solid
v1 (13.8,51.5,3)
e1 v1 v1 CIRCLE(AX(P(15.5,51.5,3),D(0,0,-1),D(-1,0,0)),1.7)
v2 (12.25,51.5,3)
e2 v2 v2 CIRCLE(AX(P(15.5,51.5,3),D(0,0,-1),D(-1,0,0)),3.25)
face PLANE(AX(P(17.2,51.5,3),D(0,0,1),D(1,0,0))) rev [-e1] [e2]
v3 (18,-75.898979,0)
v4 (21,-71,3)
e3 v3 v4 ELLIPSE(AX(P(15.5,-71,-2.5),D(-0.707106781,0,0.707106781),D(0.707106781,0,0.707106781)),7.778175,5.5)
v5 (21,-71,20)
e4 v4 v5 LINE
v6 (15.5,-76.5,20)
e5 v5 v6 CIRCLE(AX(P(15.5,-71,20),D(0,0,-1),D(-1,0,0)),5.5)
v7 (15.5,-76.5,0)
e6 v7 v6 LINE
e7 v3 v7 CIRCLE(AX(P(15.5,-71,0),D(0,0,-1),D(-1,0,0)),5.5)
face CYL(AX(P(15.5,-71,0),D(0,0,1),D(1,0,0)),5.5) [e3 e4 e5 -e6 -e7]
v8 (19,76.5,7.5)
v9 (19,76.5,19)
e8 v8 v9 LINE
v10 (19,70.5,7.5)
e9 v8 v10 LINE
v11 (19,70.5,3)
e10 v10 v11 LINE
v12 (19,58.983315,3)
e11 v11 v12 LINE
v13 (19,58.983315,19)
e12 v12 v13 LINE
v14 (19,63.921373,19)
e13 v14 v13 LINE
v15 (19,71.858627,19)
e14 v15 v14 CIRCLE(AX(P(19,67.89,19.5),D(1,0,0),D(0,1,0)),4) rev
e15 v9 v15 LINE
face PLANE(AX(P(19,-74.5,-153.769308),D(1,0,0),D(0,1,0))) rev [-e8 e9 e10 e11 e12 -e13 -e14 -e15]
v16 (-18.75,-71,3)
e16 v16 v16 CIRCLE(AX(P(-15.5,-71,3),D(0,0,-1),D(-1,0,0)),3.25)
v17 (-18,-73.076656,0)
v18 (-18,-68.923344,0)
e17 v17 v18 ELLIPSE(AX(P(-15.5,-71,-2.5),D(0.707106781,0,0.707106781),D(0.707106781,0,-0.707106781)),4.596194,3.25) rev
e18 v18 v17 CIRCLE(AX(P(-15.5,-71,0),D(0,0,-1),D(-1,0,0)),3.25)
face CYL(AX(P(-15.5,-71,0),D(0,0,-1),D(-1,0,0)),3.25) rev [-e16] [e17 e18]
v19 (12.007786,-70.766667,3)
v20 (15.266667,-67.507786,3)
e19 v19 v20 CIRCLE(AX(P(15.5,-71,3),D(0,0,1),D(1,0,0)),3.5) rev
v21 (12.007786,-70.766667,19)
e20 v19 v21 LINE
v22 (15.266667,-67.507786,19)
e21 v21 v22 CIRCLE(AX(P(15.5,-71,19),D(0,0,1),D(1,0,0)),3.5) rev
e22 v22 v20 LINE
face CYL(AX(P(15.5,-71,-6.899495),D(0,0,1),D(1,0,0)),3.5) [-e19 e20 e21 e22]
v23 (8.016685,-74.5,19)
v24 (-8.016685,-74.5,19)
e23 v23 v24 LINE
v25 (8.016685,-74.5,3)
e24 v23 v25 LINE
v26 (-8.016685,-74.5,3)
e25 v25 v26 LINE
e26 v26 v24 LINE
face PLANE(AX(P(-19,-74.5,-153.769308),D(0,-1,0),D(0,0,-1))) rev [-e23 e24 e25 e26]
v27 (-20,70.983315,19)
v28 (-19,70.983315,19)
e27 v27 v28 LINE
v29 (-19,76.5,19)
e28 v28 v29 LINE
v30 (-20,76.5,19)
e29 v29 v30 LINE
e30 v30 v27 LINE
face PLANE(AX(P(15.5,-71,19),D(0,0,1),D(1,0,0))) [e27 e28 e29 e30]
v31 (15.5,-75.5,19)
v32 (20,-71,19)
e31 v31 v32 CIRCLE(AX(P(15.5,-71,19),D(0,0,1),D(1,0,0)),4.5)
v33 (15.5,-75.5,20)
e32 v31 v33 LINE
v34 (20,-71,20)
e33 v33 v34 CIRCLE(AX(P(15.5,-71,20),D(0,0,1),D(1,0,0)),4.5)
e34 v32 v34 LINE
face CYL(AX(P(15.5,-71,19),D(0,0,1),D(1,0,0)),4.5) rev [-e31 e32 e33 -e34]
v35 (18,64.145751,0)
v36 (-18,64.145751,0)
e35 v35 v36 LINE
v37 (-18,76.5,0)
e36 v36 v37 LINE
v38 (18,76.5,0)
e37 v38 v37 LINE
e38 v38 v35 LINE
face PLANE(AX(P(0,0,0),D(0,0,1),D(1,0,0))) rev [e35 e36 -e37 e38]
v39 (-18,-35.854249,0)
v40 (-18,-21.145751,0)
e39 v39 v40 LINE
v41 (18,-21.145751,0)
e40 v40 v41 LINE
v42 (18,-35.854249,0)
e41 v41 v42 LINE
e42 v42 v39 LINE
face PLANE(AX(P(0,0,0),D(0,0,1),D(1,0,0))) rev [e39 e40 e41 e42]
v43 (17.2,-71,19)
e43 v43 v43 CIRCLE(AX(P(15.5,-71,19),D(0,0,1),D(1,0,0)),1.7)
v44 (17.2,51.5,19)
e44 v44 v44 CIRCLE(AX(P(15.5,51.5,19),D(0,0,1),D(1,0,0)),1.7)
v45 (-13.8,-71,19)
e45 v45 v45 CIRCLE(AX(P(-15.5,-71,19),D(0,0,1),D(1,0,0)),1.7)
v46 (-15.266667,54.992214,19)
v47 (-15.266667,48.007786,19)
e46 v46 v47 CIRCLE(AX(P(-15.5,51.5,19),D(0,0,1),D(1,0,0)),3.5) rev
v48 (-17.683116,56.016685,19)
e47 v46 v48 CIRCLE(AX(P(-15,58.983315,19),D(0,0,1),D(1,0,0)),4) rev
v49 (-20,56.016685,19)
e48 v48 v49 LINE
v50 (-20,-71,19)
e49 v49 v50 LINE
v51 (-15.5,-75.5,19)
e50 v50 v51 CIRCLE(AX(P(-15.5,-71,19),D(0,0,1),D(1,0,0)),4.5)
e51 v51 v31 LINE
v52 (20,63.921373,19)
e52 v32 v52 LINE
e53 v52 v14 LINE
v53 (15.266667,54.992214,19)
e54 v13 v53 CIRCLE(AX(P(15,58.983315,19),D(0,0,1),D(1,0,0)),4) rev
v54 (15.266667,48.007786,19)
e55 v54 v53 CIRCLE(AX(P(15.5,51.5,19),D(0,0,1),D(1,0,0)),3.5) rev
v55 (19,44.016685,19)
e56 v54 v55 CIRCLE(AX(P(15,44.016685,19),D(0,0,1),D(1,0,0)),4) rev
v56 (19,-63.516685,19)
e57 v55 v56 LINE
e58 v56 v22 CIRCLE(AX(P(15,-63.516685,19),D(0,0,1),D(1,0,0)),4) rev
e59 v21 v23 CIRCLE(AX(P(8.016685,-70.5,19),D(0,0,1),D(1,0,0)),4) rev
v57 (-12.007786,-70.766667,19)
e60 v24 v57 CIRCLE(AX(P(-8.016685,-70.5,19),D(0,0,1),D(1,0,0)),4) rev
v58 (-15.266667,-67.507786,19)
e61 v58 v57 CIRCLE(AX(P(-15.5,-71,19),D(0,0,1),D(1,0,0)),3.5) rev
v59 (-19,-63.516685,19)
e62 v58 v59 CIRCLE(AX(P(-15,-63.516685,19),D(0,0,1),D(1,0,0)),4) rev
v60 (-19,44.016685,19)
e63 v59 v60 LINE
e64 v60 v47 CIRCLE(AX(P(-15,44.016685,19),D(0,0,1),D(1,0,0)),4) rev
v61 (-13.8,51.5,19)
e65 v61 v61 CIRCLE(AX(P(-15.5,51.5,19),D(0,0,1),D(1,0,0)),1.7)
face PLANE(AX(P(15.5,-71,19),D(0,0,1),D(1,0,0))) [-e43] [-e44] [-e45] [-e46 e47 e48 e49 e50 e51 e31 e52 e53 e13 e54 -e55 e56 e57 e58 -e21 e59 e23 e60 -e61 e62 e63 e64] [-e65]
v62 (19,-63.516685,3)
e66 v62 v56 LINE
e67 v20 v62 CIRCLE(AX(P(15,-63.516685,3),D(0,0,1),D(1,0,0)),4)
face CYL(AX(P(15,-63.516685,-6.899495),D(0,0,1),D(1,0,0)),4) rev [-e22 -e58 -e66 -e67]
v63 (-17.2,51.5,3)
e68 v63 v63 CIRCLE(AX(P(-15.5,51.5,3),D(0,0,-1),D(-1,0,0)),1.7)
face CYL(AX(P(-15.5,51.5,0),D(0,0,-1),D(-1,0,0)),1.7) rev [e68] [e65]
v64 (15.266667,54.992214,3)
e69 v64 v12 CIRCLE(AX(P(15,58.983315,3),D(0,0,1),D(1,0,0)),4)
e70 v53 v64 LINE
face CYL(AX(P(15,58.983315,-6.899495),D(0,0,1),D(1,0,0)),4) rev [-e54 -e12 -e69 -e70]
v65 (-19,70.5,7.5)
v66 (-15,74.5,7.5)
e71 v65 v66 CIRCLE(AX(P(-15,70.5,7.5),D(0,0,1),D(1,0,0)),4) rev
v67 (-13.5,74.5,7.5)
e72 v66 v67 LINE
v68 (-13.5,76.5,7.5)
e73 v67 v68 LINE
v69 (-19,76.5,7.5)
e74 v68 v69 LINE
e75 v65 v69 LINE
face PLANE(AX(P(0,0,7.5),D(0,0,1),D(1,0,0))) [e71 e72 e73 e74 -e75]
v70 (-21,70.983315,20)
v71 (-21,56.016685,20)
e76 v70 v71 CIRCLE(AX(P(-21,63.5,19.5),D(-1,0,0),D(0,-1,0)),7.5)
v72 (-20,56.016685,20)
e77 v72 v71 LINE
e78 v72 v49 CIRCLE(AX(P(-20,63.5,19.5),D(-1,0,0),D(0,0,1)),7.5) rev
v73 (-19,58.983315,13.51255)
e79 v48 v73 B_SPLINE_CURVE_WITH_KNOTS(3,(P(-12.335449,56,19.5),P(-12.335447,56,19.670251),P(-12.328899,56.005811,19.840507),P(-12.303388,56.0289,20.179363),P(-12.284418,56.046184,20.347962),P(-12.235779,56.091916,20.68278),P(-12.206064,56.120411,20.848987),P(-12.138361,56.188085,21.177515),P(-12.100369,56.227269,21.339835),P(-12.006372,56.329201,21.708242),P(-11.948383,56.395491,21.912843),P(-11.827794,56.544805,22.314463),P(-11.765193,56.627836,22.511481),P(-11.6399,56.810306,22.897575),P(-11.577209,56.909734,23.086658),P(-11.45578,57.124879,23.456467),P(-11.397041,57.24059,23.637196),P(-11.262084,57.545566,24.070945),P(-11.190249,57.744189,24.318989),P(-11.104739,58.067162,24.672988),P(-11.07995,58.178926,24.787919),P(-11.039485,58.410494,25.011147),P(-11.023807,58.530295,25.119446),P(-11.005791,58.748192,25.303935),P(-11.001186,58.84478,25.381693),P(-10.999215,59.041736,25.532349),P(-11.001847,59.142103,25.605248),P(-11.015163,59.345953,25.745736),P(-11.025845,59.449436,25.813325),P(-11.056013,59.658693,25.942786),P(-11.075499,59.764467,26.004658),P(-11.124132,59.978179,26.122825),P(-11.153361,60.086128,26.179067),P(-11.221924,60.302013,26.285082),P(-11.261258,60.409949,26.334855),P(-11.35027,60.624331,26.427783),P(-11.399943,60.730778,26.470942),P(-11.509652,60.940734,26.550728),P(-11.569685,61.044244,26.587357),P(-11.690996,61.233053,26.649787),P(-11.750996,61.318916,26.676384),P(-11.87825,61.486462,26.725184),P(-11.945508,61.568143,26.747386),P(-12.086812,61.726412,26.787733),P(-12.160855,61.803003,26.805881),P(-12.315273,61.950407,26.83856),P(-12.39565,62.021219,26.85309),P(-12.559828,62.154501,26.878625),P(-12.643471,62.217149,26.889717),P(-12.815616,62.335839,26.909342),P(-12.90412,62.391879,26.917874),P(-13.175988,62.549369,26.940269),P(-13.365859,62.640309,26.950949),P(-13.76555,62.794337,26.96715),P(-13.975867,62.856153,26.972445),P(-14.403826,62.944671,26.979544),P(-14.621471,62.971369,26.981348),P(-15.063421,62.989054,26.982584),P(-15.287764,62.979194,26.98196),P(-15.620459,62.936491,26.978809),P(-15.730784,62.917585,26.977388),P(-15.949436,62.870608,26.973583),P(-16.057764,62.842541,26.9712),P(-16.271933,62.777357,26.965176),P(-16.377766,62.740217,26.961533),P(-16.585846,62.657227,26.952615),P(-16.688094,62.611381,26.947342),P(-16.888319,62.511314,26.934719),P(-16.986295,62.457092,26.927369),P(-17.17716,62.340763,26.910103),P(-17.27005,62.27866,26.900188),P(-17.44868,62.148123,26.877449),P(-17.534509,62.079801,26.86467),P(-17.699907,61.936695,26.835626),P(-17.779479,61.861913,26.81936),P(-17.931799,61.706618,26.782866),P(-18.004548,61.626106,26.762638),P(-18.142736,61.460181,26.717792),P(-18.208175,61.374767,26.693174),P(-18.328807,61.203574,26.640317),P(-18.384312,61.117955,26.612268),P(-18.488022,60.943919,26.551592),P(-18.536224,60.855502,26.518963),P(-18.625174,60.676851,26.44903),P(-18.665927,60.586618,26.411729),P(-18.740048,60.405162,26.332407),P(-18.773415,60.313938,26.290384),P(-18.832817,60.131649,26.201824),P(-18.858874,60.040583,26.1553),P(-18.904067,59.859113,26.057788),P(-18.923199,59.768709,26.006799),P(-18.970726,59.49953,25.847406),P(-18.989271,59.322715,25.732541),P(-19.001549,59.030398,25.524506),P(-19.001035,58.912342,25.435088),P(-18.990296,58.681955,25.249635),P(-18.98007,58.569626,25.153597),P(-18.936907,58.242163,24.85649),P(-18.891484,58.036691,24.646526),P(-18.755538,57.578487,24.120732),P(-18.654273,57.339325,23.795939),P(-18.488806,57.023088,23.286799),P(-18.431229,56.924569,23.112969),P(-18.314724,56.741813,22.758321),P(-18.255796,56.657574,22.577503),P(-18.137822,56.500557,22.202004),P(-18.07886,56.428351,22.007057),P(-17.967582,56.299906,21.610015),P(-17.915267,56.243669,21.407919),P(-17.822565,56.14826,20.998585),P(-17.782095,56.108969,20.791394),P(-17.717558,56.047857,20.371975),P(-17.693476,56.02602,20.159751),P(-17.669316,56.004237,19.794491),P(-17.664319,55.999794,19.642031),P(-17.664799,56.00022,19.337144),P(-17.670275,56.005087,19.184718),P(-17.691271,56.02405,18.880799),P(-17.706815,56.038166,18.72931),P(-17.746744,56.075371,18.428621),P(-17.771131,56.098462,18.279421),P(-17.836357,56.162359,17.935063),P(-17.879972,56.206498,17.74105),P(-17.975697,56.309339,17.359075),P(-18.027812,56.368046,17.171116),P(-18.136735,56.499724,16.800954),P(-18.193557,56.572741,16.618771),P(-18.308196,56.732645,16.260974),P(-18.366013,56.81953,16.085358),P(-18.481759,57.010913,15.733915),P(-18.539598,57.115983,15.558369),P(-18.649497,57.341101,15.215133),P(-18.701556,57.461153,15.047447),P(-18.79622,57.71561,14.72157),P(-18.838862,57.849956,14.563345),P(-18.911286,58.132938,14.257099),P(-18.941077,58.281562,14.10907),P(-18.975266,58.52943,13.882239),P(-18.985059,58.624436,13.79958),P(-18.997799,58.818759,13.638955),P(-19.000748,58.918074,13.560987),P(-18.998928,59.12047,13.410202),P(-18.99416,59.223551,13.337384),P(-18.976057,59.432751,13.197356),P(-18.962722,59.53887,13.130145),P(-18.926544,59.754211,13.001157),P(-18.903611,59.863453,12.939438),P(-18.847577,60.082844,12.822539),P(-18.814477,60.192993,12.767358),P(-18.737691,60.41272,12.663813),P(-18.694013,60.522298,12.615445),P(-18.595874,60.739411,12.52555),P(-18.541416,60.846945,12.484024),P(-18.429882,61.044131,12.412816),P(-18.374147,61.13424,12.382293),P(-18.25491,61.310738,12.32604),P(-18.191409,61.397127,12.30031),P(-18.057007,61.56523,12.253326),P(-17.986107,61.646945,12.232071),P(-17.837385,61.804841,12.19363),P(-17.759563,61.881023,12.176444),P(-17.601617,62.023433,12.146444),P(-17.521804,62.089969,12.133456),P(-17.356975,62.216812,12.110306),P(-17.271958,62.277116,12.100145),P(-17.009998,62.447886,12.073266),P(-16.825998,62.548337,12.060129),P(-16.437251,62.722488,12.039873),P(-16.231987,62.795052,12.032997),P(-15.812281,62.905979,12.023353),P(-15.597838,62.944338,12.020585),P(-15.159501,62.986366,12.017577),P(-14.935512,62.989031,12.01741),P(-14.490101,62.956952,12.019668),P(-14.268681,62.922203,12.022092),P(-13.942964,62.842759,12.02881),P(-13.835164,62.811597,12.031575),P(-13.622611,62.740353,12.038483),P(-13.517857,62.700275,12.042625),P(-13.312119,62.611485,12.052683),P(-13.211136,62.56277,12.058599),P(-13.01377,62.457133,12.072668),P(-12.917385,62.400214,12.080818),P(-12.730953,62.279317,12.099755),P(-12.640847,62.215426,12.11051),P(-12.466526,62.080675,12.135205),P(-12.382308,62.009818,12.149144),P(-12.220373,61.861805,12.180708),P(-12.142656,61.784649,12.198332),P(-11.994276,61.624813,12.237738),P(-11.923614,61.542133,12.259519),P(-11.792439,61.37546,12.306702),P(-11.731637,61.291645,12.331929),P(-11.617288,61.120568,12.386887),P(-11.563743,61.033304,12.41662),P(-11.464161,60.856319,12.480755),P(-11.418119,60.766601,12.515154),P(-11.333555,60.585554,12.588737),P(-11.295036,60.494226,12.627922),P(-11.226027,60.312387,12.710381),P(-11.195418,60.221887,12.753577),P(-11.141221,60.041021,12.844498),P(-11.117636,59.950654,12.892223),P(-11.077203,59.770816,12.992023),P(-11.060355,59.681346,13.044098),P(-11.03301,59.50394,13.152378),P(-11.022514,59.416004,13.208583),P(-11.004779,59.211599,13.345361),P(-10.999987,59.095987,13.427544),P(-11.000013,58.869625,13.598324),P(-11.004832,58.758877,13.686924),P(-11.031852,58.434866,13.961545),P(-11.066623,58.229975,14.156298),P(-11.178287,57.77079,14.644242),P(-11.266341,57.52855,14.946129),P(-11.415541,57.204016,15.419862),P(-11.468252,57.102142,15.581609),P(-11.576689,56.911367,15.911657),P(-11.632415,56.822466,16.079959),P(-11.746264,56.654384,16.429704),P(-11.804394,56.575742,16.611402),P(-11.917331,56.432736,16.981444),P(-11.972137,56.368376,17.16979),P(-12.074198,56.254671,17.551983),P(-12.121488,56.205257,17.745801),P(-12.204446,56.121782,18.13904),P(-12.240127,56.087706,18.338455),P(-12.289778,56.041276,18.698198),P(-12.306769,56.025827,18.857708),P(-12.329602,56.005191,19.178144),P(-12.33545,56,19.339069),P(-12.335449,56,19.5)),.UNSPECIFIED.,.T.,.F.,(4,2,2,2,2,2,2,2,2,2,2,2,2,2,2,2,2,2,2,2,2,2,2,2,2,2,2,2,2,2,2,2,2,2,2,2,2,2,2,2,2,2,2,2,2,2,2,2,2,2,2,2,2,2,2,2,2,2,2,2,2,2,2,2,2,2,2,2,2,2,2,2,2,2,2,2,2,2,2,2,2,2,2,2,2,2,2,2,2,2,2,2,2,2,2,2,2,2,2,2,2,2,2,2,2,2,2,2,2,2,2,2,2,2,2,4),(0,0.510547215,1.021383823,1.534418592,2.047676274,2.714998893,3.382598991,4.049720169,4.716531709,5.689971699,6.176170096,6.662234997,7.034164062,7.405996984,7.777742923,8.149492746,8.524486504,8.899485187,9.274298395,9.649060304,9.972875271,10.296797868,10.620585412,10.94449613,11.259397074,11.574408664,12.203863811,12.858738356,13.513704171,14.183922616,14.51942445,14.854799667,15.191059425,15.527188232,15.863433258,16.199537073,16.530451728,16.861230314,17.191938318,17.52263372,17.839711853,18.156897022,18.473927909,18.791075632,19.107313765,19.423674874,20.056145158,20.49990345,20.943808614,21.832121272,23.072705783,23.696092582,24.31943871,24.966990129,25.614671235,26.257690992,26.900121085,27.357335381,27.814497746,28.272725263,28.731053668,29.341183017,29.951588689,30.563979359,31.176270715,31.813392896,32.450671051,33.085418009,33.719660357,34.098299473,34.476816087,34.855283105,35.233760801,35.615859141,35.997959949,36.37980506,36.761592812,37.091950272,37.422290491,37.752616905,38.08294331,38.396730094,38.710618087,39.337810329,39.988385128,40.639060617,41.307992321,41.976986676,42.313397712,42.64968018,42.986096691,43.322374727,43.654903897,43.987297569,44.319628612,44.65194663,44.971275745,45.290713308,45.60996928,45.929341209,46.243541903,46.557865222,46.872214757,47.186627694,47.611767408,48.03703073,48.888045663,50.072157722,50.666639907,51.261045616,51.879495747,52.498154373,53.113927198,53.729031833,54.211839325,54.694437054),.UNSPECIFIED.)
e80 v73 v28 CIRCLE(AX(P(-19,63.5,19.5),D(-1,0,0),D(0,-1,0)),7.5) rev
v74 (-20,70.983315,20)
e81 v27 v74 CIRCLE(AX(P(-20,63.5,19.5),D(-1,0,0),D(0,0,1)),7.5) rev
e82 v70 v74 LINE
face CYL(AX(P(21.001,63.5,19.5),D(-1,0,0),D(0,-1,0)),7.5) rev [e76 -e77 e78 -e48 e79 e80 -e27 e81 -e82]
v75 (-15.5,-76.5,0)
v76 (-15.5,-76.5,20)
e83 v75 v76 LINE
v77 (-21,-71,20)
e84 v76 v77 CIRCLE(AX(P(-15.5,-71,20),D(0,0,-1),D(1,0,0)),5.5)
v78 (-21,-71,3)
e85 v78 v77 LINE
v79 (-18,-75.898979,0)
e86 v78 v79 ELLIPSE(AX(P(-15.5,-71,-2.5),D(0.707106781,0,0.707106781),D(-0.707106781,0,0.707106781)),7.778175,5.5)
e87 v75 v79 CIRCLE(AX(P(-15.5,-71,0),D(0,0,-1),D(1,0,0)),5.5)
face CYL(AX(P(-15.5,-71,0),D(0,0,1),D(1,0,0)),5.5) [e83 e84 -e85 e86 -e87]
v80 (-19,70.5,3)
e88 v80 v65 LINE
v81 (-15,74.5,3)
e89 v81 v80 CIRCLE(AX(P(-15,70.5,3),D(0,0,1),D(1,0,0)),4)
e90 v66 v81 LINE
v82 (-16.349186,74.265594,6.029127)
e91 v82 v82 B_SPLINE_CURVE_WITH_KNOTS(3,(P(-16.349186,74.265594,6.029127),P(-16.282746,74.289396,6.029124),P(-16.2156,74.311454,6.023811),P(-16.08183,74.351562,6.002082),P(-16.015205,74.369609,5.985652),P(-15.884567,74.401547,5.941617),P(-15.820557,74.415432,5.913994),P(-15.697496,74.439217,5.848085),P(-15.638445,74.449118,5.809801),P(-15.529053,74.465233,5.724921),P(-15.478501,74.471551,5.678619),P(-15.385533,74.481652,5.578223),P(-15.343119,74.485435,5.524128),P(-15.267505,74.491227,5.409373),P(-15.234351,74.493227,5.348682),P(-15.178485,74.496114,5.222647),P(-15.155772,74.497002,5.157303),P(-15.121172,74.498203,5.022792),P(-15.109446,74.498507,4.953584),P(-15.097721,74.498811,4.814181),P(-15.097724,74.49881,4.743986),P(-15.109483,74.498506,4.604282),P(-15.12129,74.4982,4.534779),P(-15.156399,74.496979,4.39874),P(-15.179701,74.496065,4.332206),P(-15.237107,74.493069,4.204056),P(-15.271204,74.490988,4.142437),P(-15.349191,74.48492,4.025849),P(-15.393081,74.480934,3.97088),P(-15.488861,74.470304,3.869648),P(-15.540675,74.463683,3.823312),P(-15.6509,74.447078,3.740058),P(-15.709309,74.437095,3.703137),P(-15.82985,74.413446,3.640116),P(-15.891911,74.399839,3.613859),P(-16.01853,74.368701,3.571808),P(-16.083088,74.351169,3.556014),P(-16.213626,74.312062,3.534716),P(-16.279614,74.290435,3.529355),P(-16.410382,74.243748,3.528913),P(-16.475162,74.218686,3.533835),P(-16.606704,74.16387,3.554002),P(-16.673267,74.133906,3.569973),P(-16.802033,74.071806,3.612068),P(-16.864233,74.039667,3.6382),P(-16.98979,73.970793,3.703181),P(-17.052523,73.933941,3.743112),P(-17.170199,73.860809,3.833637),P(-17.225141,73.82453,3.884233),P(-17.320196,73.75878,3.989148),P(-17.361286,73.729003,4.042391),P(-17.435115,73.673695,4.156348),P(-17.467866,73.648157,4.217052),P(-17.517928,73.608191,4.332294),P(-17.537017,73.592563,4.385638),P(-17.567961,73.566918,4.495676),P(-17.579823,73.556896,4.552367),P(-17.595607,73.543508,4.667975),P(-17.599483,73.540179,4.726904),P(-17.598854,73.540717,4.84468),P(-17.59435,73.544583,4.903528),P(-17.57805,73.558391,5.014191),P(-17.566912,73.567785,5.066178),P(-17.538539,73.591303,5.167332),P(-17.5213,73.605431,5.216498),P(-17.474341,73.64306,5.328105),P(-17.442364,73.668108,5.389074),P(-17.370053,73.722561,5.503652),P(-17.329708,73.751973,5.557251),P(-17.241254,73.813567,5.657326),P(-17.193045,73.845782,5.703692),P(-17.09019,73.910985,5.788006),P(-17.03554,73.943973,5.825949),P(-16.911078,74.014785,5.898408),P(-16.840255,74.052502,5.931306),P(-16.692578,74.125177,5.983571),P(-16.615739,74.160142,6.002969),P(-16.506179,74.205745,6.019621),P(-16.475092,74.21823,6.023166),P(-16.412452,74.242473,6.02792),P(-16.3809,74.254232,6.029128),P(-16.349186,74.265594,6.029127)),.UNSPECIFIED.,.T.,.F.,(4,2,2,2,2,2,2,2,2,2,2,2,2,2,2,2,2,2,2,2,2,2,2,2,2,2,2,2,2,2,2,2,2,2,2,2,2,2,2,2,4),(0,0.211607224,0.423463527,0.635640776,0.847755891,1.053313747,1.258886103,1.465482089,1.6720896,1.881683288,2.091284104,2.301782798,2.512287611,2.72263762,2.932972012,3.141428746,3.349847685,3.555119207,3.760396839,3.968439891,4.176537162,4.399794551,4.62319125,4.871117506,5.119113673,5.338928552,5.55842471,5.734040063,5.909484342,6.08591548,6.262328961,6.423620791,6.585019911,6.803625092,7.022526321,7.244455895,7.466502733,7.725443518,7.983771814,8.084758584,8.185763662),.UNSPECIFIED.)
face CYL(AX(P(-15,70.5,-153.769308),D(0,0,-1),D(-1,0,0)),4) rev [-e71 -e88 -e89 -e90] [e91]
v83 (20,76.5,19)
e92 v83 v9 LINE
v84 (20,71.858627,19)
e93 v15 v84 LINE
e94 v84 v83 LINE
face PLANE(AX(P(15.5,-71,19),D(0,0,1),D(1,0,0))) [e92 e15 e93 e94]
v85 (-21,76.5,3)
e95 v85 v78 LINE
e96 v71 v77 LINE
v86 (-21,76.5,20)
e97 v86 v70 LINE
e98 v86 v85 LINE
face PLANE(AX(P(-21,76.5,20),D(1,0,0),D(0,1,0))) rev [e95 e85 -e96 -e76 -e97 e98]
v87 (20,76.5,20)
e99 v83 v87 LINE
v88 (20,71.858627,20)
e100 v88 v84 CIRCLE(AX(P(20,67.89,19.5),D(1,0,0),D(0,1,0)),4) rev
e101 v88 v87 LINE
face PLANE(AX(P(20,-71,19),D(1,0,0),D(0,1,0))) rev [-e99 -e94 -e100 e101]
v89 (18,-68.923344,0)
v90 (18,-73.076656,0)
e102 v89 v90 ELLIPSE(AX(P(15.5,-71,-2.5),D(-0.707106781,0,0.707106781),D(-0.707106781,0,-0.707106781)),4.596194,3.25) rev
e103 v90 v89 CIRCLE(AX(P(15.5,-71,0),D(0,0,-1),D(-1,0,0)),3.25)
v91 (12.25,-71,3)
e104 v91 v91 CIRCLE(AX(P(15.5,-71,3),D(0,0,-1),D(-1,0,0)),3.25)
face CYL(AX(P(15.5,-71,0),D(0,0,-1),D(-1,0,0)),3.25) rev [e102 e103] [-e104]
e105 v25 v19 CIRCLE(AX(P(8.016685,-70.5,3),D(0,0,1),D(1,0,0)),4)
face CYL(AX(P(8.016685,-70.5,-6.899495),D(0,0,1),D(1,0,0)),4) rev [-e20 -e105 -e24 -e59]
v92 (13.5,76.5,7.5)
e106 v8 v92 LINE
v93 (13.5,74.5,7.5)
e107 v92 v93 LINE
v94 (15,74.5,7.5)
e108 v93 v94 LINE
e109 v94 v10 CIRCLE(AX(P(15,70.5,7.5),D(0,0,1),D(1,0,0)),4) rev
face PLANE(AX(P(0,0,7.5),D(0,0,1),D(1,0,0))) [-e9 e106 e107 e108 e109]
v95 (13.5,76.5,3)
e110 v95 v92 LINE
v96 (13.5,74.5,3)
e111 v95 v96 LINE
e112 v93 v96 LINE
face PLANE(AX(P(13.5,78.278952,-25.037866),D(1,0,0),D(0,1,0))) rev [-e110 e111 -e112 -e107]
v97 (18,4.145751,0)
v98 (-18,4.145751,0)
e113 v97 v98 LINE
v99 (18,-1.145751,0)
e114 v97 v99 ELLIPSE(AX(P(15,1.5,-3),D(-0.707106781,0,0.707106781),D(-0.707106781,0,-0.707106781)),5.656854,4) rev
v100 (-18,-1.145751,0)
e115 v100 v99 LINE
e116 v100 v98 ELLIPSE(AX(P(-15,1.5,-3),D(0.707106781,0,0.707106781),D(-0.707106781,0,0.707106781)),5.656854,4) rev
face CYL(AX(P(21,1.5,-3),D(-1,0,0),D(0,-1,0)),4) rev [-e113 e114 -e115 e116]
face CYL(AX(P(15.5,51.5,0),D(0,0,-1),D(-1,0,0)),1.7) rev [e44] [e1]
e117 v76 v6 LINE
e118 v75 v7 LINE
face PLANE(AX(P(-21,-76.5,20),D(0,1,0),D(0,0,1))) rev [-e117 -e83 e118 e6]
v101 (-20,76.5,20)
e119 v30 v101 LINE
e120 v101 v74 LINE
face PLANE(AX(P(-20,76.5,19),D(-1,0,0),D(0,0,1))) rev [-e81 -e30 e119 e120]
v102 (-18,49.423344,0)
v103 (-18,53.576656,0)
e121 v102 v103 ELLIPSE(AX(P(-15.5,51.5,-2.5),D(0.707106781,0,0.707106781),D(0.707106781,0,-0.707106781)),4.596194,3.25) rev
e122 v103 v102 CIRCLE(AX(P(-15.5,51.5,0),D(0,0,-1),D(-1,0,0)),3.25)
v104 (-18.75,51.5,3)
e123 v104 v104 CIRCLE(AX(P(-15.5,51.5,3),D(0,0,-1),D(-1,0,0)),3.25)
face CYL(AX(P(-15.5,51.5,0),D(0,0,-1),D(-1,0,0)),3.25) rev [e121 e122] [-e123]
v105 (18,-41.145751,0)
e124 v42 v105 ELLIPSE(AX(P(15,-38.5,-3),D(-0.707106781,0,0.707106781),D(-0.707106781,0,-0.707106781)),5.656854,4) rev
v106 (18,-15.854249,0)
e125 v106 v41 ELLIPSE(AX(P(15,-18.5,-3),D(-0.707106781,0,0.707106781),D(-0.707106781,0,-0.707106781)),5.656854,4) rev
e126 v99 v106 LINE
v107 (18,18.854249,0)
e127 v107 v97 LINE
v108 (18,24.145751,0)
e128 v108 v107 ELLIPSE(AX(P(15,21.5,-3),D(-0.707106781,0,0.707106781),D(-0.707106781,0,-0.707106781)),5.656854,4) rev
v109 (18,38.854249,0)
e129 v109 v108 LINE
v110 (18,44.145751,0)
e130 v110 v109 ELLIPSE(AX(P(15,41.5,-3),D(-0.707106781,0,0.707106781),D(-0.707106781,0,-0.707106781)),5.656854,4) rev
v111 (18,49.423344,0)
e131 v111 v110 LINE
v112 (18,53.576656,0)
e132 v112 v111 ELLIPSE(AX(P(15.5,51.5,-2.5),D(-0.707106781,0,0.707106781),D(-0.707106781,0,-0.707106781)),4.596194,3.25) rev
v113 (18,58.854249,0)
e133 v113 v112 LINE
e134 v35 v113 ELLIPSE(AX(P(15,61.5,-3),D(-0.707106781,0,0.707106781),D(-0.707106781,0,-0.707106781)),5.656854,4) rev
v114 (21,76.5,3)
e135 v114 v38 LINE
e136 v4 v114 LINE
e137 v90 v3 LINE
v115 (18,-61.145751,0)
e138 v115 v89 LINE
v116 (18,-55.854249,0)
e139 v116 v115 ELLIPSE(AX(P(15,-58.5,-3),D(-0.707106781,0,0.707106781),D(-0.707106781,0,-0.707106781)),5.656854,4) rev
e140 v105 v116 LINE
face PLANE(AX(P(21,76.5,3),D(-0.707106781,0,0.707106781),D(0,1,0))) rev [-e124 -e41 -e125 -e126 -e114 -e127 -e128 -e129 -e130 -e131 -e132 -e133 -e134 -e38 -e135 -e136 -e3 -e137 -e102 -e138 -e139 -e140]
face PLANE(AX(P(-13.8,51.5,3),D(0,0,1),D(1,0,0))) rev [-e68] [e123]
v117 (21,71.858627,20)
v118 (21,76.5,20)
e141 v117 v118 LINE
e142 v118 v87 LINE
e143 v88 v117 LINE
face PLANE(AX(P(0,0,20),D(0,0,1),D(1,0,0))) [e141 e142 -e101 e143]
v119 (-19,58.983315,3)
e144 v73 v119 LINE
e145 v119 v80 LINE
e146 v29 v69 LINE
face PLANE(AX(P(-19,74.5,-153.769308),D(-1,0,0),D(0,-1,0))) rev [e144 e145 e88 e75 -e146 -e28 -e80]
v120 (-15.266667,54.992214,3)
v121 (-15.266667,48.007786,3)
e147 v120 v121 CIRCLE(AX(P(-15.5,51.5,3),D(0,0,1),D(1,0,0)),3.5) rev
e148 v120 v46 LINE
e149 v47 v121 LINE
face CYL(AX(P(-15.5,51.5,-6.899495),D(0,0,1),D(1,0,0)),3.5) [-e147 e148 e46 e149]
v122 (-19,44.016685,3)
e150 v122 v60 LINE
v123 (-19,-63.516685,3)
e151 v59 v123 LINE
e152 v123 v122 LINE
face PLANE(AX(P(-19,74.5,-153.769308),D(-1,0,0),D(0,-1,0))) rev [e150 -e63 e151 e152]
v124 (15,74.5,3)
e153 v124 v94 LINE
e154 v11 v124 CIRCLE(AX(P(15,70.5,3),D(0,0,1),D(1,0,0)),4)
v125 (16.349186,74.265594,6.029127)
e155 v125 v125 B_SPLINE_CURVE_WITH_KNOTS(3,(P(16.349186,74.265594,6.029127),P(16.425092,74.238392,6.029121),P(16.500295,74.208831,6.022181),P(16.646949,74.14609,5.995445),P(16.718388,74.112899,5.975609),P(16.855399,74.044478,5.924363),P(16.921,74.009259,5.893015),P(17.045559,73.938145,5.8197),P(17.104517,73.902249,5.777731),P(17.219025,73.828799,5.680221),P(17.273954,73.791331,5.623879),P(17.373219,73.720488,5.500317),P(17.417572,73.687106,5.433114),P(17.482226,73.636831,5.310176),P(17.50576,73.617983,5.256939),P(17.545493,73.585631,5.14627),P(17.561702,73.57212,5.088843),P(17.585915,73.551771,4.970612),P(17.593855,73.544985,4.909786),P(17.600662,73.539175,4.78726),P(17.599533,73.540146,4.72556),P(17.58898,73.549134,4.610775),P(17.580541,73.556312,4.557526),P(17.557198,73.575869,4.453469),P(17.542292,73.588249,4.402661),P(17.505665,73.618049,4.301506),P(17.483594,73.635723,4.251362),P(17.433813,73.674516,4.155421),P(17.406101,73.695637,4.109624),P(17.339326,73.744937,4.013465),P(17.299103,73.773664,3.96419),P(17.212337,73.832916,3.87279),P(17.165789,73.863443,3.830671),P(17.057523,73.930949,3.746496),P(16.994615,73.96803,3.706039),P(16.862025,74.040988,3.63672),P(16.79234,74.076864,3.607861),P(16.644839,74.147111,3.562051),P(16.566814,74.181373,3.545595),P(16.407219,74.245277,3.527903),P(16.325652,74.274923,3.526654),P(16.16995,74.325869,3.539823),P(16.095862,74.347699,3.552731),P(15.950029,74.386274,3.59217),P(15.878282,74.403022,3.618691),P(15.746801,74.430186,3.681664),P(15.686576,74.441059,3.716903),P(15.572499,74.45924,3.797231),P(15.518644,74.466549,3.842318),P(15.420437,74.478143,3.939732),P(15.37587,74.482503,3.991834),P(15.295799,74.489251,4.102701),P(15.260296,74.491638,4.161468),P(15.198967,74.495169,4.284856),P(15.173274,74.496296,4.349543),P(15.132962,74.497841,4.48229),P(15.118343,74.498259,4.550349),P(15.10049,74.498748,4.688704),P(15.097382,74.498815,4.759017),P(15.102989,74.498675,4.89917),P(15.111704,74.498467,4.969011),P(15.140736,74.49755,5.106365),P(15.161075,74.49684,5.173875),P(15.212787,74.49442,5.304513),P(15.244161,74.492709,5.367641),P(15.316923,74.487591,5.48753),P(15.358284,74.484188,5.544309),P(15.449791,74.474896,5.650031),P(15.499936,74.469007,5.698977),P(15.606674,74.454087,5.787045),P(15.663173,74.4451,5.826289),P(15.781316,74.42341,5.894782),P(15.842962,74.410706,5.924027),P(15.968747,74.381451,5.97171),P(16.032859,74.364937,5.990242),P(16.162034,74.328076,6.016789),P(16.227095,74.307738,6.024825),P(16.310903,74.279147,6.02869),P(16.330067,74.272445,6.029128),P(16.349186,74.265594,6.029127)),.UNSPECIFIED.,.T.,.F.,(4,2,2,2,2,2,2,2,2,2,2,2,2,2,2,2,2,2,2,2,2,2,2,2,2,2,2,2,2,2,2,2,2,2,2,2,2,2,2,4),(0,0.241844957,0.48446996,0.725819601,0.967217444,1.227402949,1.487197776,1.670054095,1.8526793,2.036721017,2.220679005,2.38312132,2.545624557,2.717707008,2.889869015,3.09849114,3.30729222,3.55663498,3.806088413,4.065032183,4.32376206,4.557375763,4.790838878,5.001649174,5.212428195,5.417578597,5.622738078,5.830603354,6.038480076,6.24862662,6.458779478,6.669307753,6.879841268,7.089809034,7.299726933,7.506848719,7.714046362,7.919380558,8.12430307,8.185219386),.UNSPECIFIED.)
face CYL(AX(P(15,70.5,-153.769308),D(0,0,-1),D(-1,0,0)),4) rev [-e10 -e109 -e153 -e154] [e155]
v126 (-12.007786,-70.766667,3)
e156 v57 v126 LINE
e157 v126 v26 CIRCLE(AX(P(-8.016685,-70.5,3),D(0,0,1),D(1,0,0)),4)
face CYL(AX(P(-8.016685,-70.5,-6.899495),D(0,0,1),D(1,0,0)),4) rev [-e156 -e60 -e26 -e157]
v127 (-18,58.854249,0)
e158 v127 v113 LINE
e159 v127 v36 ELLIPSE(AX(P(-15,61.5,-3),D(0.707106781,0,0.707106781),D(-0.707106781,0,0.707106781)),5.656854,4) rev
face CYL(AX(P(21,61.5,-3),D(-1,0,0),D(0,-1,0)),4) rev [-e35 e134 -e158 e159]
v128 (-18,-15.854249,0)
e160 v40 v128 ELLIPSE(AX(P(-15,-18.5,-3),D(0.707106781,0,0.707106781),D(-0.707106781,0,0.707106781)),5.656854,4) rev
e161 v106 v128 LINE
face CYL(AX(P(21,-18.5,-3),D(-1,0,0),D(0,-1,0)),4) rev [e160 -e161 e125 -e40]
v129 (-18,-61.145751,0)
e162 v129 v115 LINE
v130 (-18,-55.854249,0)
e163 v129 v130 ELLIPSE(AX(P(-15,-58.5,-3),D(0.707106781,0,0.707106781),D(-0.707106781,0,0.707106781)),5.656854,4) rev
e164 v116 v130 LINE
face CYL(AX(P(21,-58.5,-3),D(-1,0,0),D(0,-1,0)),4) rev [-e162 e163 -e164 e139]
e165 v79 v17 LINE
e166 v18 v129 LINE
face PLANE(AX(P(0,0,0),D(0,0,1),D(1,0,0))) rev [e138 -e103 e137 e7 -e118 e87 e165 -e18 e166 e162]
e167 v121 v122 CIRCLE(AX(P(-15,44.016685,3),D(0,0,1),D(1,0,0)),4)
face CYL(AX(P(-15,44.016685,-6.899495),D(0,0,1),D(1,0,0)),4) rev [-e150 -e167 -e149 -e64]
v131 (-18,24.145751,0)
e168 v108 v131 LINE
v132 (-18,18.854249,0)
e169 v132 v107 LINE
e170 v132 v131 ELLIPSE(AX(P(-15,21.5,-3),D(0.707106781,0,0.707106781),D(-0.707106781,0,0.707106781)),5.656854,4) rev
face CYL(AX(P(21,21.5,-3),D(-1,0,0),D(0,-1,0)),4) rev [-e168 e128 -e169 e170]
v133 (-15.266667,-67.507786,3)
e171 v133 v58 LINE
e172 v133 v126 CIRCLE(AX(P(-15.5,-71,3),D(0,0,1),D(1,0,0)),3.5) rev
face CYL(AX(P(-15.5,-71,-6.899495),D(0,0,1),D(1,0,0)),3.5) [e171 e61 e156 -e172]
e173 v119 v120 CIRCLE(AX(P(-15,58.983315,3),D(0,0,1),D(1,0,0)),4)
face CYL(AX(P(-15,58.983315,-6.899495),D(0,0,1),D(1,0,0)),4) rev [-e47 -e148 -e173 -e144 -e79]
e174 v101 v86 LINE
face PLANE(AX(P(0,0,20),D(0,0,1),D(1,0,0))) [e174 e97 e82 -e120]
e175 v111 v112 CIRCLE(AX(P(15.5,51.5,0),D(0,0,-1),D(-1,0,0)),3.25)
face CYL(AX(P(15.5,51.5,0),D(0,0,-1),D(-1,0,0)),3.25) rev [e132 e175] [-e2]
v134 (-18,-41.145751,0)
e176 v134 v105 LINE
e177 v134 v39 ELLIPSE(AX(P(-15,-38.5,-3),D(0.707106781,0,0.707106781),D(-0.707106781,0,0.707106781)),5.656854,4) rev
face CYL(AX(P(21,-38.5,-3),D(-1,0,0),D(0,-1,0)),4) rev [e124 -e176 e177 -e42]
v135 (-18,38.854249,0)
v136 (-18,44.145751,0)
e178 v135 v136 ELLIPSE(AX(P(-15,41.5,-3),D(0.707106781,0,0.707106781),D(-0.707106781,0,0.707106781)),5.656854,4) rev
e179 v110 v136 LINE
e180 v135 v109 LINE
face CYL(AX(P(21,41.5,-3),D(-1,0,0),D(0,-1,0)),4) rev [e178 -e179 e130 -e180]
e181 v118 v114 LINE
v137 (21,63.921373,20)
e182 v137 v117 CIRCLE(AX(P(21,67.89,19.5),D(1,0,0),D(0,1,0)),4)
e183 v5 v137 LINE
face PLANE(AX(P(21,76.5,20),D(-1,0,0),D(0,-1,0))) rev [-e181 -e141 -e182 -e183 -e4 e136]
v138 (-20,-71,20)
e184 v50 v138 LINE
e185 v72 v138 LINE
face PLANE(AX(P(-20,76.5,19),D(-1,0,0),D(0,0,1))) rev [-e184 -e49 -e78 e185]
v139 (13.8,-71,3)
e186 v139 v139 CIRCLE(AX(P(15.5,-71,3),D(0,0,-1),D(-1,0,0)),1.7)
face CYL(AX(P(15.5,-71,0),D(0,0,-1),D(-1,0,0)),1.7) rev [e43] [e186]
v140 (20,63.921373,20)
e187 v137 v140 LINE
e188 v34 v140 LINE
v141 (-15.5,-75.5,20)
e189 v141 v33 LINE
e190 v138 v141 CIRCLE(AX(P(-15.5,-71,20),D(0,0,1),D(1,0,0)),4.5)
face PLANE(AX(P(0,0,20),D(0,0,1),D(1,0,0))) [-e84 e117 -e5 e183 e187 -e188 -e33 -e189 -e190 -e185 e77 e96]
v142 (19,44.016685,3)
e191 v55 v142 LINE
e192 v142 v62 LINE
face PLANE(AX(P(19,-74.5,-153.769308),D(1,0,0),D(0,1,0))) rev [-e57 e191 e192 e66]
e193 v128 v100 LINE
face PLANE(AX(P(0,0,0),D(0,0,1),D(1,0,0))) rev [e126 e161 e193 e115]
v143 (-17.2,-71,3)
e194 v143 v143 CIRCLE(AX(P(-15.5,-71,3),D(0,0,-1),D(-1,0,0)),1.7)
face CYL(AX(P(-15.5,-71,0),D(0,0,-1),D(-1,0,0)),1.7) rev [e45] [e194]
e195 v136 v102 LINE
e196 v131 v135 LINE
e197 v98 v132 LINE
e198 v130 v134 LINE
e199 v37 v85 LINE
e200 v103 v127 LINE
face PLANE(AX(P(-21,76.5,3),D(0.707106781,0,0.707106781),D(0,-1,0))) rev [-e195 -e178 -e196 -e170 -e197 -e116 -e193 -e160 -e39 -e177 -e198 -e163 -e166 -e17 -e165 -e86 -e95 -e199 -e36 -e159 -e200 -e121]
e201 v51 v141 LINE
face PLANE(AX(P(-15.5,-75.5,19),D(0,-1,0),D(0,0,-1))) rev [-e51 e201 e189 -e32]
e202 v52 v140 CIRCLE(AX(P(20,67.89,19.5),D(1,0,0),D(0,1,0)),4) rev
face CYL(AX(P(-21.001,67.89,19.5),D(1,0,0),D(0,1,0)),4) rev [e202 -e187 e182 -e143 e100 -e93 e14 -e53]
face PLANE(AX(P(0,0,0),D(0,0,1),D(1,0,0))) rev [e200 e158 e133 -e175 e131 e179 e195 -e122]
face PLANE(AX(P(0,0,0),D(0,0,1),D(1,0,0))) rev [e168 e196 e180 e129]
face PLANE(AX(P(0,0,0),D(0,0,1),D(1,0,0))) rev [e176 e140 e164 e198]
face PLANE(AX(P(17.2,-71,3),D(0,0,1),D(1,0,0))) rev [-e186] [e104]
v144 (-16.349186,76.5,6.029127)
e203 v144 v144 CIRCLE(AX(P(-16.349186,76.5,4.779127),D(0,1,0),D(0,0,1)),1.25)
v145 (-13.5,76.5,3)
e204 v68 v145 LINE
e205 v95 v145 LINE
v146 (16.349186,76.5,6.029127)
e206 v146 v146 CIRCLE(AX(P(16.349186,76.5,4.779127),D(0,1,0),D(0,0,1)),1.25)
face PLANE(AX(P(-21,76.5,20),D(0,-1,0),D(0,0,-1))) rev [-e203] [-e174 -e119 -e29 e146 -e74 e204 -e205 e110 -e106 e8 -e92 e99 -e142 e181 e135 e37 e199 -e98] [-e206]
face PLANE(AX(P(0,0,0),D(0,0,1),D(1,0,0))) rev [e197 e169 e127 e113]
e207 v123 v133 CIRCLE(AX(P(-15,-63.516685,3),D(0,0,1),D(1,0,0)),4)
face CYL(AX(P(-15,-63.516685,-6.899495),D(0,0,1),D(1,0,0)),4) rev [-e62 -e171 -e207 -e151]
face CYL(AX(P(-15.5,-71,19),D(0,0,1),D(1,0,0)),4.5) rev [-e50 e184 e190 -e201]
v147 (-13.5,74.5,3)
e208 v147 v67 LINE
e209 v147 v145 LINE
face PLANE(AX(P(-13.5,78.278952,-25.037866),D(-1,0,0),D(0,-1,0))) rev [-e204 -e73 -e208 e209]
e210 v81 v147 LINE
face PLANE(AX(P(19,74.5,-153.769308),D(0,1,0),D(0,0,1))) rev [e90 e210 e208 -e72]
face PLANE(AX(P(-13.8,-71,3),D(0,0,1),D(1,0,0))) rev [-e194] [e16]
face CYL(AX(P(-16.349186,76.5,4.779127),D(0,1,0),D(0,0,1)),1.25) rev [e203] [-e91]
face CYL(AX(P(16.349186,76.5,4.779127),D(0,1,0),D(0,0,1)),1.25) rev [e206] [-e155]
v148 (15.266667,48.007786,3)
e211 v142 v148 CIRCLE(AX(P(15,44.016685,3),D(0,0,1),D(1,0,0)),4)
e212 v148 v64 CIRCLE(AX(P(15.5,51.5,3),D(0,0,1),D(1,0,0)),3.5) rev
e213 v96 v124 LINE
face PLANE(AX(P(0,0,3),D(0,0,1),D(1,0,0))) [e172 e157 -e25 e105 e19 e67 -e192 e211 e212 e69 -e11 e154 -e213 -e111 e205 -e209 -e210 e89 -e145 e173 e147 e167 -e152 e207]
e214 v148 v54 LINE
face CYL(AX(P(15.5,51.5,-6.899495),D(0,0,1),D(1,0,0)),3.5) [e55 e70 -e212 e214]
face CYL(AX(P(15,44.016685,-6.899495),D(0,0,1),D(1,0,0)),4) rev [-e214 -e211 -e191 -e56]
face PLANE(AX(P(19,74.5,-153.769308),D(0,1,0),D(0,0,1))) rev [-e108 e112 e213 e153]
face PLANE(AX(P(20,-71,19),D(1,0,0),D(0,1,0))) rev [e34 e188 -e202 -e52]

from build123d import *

# Parameters (mm, degrees)
SKETCH_1_W                  = 42
SKETCH_1_H                  = 153
EXTRUDE_1_DEPTH             = 20
SKETCH_2_W                  = 38
SKETCH_2_H                  = 149
CUT_EXTRUDE_1_DEPTH         = 17
EXTRUDE_3_DEPTH             = 17
FILLET_START                = 2
FILLET_2_DEPTH              = 18
CHAMFER_1_SIZE              = 3
CUT_EXTRUDE_3_DEPTH         = 82.812285141
SKETCH_8_R                  = 4
CUT_EXTRUDE_4_DEPTH         = 90.533513279
SKETCH_13_W                 = 27
SKETCH_13_H                 = 7.55790464
CUT_EXTRUDE_6_DEPTH         = 17
SKETCH_14_W                 = 38
SKETCH_14_H                 = 15.071373518
CUT_EXTRUDE_7_DEPTH         = 12.5
CUT_EXTRUDE_8_DEPTH         = 1
HOLE_WIZARD_M31_D           = 3.4
HOLE_WIZARD_M31_CBORE_D     = 6.5
HOLE_WIZARD_M31_CBORE_DEPTH = 3
M3X0_51_D                   = 2.5
M3X0_51_DEPTH               = 12.5
M3X0_51_TIP                 = 0.751075774
CUT_EXTRUDE_9_REACH         = 91.534
SKETCH_22_R                 = 7.5
CUT_EXTRUDE_10_REACH        = 91.534
SKETCH_23_R                 = 4


with BuildPart() as part:
    # Эскиз1 → Бобышка-Вытянуть1 (new body)
    with BuildSketch(Plane.XY):
        Rectangle(SKETCH_1_W, SKETCH_1_H)
    extrude(amount=EXTRUDE_1_DEPTH)

    # Эскиз2 → Вырез-Вытянуть1 (cut)
    with BuildSketch(Plane.XY.offset(20)):
        Rectangle(SKETCH_2_W, SKETCH_2_H)
    extrude(amount=-CUT_EXTRUDE_1_DEPTH, mode=Mode.SUBTRACT)

    # Эскиз3 → Бобышка-Вытянуть3 (add)
    with BuildSketch(Plane.XY.offset(20)):
        with BuildLine():
            Line((-19, -71), (-19, -74.5))
            Line((-19, -74.5), (-15.5, -74.5))
            ThreePointArc((-15.5, -74.5), (-13.025126266, -68.525126266), (-19, -71))
        make_face()
        with BuildLine():
            Line((19, -71), (19, -74.5))
            Line((19, -74.5), (15.5, -74.5))
            ThreePointArc((15.5, -74.5), (13.025126266, -68.525126266), (19, -71))
        make_face()
        with BuildLine():
            Line((-15.5, 55), (-19, 55))
            Line((-19, 55), (-19, 48))
            Line((-19, 48), (-15.5, 48))
            ThreePointArc((-15.5, 48), (-12, 51.5), (-15.5, 55))
        make_face()
        with BuildLine():
            Line((15.5, 55), (19, 55))
            Line((19, 55), (19, 48))
            Line((19, 48), (15.5, 48))
            ThreePointArc((15.5, 48), (12, 51.5), (15.5, 55))
        make_face()
    extrude(amount=-EXTRUDE_3_DEPTH)

    # Скругление2: read off the stored shape, not the designer's step
    # Скругление2 outline → Скругление2 (add)
    with BuildSketch(Plane.XY.offset(FILLET_START)):
        with BuildLine():
            ThreePointArc((19, 58.983314774), (17.921186974, 56.25079457), (15.266666667, 54.992213561))
            ThreePointArc((15.266666667, 54.992213561), (15.383268392, 54.998052849), (15.5, 55))
            Line((15.5, 55), (19, 55))
            Line((19, 55), (19, 58.983314774))
        make_face()
        with BuildLine():
            ThreePointArc((15.5, 48), (15.383268392, 48.001947151), (15.266666667, 48.007786439))
            ThreePointArc((15.266666667, 48.007786439), (17.921186974, 46.74920543), (19, 44.016685226))
            Line((19, 44.016685226), (19, 48))
            Line((19, 48), (15.5, 48))
        make_face()
        with BuildLine():
            ThreePointArc((15, 74.5), (17.828427125, 73.328427125), (19, 70.5))
            Line((19, 70.5), (19, 74.5))
            Line((19, 74.5), (15, 74.5))
        make_face()
        with BuildLine():
            Line((19, -71), (19, -63.516685226))
            ThreePointArc((19, -63.516685226), (17.921186974, -66.24920543), (15.266666667, -67.507786439))
            ThreePointArc((15.266666667, -67.507786439), (17.890955179, -68.443961399), (19, -71))
        make_face()
        with BuildLine():
            ThreePointArc((-19, 70.5), (-17.828427125, 73.328427125), (-15, 74.5))
            Line((-15, 74.5), (-19, 74.5))
            Line((-19, 74.5), (-19, 70.5))
        make_face()
        with BuildLine():
            ThreePointArc((15.5, -74.5), (12.943961399, -73.390955179), (12.007786439, -70.766666667))
            ThreePointArc((12.007786439, -70.766666667), (10.74920543, -73.421186974), (8.016685226, -74.5))
            Line((8.016685226, -74.5), (15.5, -74.5))
        make_face()
        with BuildLine():
            ThreePointArc((-15.266666667, 54.992213561), (-17.921186974, 56.25079457), (-19, 58.983314774))
            Line((-19, 58.983314774), (-19, 55))
            Line((-19, 55), (-15.5, 55))
            ThreePointArc((-15.5, 55), (-15.383268392, 54.998052849), (-15.266666667, 54.992213561))
        make_face()
        with BuildLine():
            Line((-15.5, -74.5), (-8.016685226, -74.5))
            ThreePointArc((-8.016685226, -74.5), (-10.74920543, -73.421186974), (-12.007786439, -70.766666667))
            ThreePointArc((-12.007786439, -70.766666667), (-12.943961399, -73.390955179), (-15.5, -74.5))
        make_face()
        with BuildLine():
            ThreePointArc((-19, 44.016685226), (-17.921186974, 46.74920543), (-15.266666667, 48.007786439))
            ThreePointArc((-15.266666667, 48.007786439), (-15.383268392, 48.001947151), (-15.5, 48))
            Line((-15.5, 48), (-19, 48))
            Line((-19, 48), (-19, 44.016685226))
        make_face()
        with BuildLine():
            ThreePointArc((-19, -71), (-17.890955179, -68.443961399), (-15.266666667, -67.507786439))
            ThreePointArc((-15.266666667, -67.507786439), (-17.921186974, -66.24920543), (-19, -63.516685226))
            Line((-19, -63.516685226), (-19, -71))
        make_face()
    extrude(amount=FILLET_2_DEPTH)

    # Фаска1
    chamfer_1_edges = [part.edges().sort_by_distance(p)[0] for p in [
        (-21, 0, 0),
        (21, 0, 0),
    ]]
    chamfer(chamfer_1_edges, length=CHAMFER_1_SIZE)

    # Эскиз7 → Вырез-Вытянуть3 (cut, through all)
    with BuildSketch(Plane.XY.offset(20)):
        with BuildLine():
            Line((-21, -71), (-21, -76.5))
            Line((-21, -76.5), (-15.5, -76.5))
            ThreePointArc((-15.5, -76.5), (-19.389087297, -74.889087297), (-21, -71))
        make_face()
        with BuildLine():
            Line((21, -76.5), (15.5, -76.5))
            ThreePointArc((15.5, -76.5), (19.389087297, -74.889087297), (21, -71))
            Line((21, -71), (21, -76.5))
        make_face()
    extrude(amount=-CUT_EXTRUDE_3_DEPTH, mode=Mode.SUBTRACT)

    # Эскиз8 → Вырез-Вытянуть4 (cut, through all)
    with BuildSketch(Plane.ZY.offset(21)):
        with Locations((-3, -58.5)):
            Circle(SKETCH_8_R)
        with Locations((-3, -38.5)):
            Circle(SKETCH_8_R)
        with Locations((-3, -18.5)):
            Circle(SKETCH_8_R)
        with Locations((-3, 1.5)):
            Circle(SKETCH_8_R)
        with Locations((-3, 21.5)):
            Circle(SKETCH_8_R)
        with Locations((-3, 41.5)):
            Circle(SKETCH_8_R)
        with Locations((-3, 61.5)):
            Circle(SKETCH_8_R)
    extrude(amount=-CUT_EXTRUDE_4_DEPTH, mode=Mode.SUBTRACT)

    # Эскиз13 → Вырез-Вытянуть6 (cut)
    with BuildSketch(Plane.XY.offset(20)):
        with Locations((0, 74.5)):
            Rectangle(SKETCH_13_W, SKETCH_13_H)
    extrude(amount=-CUT_EXTRUDE_6_DEPTH, mode=Mode.SUBTRACT)

    # Эскиз14 → Вырез-Вытянуть7 (cut)
    with BuildSketch(Plane.XY.offset(20)):
        with Locations((0, 76.5)):
            Rectangle(SKETCH_14_W, SKETCH_14_H)
    extrude(amount=-CUT_EXTRUDE_7_DEPTH, mode=Mode.SUBTRACT)

    # Эскиз15 → Вырез-Вытянуть8 (cut)
    with BuildSketch(Plane.XY.offset(20)):
        with BuildLine():
            Line((-20, 76.5), (20, 76.5))
            Line((20, 76.5), (20, -71))
            ThreePointArc((20, -71), (18.681980515, -74.181980515), (15.5, -75.5))
            Line((15.5, -75.5), (-15.5, -75.5))
            ThreePointArc((-15.5, -75.5), (-18.681980515, -74.181980515), (-20, -71))
            Line((-20, -71), (-20, 76.5))
        make_face()
    extrude(amount=-CUT_EXTRUDE_8_DEPTH, mode=Mode.SUBTRACT)

    # Цековка для винта с внутренним шестигранником M31 (through all)
    with Locations(Plane(origin=(0, 0, 0), x_dir=(-1, 0, 0), z_dir=(0, 0, -1))):
        with Locations((-15.5, 51.5), (15.5, 51.5), (15.5, -71), (-15.5, -71)):
            CounterBoreHole(HOLE_WIZARD_M31_D / 2, HOLE_WIZARD_M31_CBORE_D / 2, HOLE_WIZARD_M31_CBORE_DEPTH)

    # Отверстие обработанное метчиком M3x0.51
    with Locations(Plane(origin=(0, 76.5, 0), x_dir=(1, 0, 0), z_dir=(0, 1, 0))):
        with Locations((-16.349186161, -4.77912666), (16.349186161, -4.77912666)):
            Hole(M3X0_51_D / 2, depth=M3X0_51_DEPTH)
            with Locations((0, 0, -(M3X0_51_DEPTH + M3X0_51_TIP / 2))):  # 118° drill point
                Cone(0, M3X0_51_D / 2, M3X0_51_TIP, mode=Mode.SUBTRACT)

    # Эскиз22 → Вырез-Вытянуть9 (cut, up to next)
    with BuildSketch(Plane.ZY.offset(21), mode=Mode.PRIVATE) as cut_extrude_9_sk1:
        with Locations((19.5, 63.5)):
            Circle(SKETCH_22_R)
    cut_extrude_9_tool1 = extrude(cut_extrude_9_sk1.sketch, amount=-CUT_EXTRUDE_9_REACH, mode=Mode.PRIVATE) & part.part
    add(cut_extrude_9_tool1.solids().sort_by_distance((-21, 63.5, 19.5))[0], mode=Mode.SUBTRACT)

    # Эскиз23 → Вырез-Вытянуть10 (cut, up to next)
    with BuildSketch(Plane(origin=(21, 0, 0), x_dir=(0, 0, -1), z_dir=(1, 0, 0)), mode=Mode.PRIVATE) as cut_extrude_10_sk1:
        with Locations((-19.5, 67.89)):
            Circle(SKETCH_23_R)
    cut_extrude_10_tool1 = extrude(cut_extrude_10_sk1.sketch, amount=-CUT_EXTRUDE_10_REACH, mode=Mode.PRIVATE) & part.part
    add(cut_extrude_10_tool1.solids().sort_by_distance((21, 67.89, 19.5))[0], mode=Mode.SUBTRACT)


solid = part.part
